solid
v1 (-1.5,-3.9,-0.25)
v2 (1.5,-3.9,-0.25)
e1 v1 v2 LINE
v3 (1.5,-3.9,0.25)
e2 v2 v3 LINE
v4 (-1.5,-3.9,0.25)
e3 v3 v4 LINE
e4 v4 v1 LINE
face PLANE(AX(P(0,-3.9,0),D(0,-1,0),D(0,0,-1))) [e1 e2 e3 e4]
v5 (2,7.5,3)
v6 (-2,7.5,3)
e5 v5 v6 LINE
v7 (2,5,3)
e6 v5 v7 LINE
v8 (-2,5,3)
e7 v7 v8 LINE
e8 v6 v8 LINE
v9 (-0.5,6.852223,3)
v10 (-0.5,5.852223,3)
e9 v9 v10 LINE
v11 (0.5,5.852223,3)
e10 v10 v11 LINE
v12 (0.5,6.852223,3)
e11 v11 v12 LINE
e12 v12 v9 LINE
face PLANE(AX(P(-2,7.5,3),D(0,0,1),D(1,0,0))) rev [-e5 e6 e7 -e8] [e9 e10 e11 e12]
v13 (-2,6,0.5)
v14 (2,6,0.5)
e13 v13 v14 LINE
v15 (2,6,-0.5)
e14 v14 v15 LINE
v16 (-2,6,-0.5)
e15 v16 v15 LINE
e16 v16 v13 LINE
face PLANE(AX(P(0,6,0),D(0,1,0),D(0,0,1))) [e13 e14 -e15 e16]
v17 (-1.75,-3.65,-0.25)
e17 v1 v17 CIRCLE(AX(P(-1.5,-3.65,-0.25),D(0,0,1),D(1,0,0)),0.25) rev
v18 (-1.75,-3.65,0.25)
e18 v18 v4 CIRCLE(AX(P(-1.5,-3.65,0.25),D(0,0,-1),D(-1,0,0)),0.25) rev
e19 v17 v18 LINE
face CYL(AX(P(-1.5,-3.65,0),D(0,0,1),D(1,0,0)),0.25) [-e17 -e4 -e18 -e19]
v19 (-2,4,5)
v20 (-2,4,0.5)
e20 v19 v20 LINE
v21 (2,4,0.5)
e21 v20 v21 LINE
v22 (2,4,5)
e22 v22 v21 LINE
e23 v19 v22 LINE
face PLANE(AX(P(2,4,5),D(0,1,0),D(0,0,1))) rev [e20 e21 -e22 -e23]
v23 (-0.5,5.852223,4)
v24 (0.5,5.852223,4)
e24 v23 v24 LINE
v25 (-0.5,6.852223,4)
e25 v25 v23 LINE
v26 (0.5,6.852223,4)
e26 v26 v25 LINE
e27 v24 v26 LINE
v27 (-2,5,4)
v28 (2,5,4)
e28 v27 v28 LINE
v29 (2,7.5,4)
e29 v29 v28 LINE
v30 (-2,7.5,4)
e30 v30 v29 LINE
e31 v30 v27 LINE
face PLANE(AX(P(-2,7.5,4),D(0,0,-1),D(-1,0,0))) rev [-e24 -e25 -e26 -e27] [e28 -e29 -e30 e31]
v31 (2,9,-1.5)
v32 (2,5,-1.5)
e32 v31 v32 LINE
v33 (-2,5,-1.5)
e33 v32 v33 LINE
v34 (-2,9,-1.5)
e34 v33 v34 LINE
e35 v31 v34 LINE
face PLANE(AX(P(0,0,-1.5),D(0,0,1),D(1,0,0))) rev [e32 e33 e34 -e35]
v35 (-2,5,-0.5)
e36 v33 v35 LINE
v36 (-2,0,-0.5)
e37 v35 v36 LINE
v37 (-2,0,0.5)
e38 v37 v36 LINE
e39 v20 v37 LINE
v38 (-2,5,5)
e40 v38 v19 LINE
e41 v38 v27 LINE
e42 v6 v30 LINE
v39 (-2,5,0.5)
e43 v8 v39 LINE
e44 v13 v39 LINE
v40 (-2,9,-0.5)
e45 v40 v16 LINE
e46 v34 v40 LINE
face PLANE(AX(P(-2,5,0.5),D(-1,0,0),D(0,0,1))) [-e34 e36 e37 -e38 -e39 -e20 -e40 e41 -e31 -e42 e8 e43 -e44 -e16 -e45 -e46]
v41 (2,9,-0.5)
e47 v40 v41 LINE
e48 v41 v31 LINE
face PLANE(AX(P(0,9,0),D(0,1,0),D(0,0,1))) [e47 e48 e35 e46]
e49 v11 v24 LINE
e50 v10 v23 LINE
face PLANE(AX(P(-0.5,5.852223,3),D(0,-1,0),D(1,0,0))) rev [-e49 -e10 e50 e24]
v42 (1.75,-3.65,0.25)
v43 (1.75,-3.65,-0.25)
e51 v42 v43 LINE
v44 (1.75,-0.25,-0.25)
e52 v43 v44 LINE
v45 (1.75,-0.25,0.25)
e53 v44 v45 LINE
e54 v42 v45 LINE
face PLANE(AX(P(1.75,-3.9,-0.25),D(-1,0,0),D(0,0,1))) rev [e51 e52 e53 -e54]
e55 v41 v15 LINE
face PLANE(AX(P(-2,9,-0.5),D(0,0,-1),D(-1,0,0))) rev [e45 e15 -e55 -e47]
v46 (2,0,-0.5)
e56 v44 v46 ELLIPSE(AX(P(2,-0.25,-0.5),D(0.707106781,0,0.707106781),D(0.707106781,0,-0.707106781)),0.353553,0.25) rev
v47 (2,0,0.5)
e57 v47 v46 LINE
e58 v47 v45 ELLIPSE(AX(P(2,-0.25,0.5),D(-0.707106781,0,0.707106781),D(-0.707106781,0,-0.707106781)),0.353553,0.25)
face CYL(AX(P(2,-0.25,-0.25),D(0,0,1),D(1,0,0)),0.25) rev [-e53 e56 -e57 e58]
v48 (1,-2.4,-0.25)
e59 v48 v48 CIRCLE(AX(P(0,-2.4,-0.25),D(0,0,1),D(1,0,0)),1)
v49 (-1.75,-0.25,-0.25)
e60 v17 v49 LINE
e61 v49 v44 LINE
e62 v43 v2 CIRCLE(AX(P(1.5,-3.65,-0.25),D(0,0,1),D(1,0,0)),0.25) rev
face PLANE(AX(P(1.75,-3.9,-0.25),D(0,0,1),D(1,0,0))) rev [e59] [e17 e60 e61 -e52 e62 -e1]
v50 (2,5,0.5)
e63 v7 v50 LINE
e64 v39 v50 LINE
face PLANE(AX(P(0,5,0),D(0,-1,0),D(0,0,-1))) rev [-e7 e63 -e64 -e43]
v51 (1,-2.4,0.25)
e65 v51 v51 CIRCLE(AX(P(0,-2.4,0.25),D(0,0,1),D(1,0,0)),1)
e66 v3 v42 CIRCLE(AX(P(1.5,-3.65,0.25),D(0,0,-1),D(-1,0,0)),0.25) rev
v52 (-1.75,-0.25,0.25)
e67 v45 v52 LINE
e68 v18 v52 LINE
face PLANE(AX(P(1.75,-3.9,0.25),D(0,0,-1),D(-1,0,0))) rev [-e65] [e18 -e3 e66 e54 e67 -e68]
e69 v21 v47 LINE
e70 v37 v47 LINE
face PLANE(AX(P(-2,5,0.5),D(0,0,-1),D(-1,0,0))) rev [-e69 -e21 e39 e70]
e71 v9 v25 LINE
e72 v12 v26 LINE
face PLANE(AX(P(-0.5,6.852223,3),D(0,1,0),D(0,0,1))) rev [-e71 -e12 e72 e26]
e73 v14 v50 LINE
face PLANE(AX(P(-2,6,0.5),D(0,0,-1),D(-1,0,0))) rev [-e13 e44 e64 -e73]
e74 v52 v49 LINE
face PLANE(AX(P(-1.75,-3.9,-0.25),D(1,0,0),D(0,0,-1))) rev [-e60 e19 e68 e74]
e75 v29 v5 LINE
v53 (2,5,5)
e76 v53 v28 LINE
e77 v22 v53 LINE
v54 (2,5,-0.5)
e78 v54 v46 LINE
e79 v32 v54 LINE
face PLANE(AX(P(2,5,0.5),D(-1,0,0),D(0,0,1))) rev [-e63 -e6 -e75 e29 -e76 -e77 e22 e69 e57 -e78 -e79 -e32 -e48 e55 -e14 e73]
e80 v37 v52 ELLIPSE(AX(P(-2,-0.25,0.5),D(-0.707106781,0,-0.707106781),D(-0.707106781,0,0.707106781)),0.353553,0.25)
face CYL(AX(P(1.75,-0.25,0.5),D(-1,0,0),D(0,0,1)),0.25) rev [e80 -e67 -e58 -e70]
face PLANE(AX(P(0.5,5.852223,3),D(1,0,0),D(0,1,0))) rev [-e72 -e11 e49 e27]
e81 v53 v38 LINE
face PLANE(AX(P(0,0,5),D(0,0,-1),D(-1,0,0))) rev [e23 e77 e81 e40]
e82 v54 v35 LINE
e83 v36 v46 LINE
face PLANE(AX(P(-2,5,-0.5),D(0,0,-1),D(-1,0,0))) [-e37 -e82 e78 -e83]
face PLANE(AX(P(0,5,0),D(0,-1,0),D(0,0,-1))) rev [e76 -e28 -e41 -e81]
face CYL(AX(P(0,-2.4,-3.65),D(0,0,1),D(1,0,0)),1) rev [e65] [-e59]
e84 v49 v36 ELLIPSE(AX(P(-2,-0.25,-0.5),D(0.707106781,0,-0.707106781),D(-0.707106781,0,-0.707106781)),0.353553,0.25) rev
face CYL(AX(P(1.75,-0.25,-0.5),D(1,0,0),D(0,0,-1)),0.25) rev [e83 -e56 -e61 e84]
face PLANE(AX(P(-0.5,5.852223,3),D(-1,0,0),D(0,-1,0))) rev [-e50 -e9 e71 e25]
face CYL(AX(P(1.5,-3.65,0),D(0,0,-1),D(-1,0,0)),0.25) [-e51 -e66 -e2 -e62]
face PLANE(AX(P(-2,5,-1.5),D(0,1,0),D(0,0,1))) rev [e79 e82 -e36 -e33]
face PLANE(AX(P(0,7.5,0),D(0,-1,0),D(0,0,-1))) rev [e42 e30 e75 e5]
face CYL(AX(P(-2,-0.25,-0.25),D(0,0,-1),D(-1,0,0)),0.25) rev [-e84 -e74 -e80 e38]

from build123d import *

# Parameters (mm, degrees)
SZKIC1_W                    = 4
SZKIC1_H                    = 1
DODANIE_WYCI_GNI_CIE1_DEPTH = 5
SZKIC2_W                    = 4
SZKIC2_H                    = 1
DODANIE_WYCI_GNI_CIE2_DEPTH = 4.5
SZKIC3_W                    = 4
SZKIC3_H                    = 1
DODANIE_WYCI_GNI_CIE3_DEPTH = 1
SZKIC4_W                    = 4
SZKIC4_H                    = 1
DODANIE_WYCI_GNI_CIE4_DEPTH = 1
SZKIC5_W                    = 4
SZKIC5_H                    = 1
DODANIE_WYCI_GNI_CIE5_DEPTH = 3
SZKIC6_W                    = 4
SZKIC6_H                    = 1
DODANIE_WYCI_GNI_CIE6_DEPTH = 2.5
SZKIC8_W                    = 3.5
SZKIC8_H                    = 0.5
DODANIE_WYCI_GNI_CIE7_DEPTH = 3.9
SZKIC9_R                    = 1
WYTNIJ_WYCI_GNI_CIE2_DEPTH  = 3.9
ZAOKR_GLENIE1_R             = 0.25
SZKIC10_W                   = 1
SZKIC10_H                   = 1
WYTNIJ_WYCI_GNI_CIE3_DEPTH  = 1


with BuildPart() as part:
    # Szkic1 → Dodanie-wyciągnięcie1 (new body)
    with BuildSketch(Plane(origin=(0, 0, 0), x_dir=(1, 0, 0), z_dir=(0, 1, 0))):
        Rectangle(SZKIC1_W, SZKIC1_H)
    extrude(amount=DODANIE_WYCI_GNI_CIE1_DEPTH)

    # Szkic2 → Dodanie-wyciągnięcie2 (add)
    with BuildSketch(Plane.XY.offset(0.5)):
        with Locations((0, 4.5)):
            Rectangle(SZKIC2_W, SZKIC2_H)
    extrude(amount=DODANIE_WYCI_GNI_CIE2_DEPTH)

    # Szkic3 → Dodanie-wyciągnięcie3 (add)
    with BuildSketch(Plane(origin=(0, 5, 0), x_dir=(1, 0, 0), z_dir=(0, 1, 0))):
        Rectangle(SZKIC3_W, SZKIC3_H)
    extrude(amount=DODANIE_WYCI_GNI_CIE3_DEPTH)

    # Szkic4 → Dodanie-wyciągnięcie4 (add)
    with BuildSketch(Plane(origin=(0, 0, -0.5), x_dir=(-1, 0, 0), z_dir=(0, 0, -1))):
        with Locations((0, 5.5)):
            Rectangle(SZKIC4_W, SZKIC4_H)
    extrude(amount=DODANIE_WYCI_GNI_CIE4_DEPTH)

    # Szkic5 → Dodanie-wyciągnięcie5 (add)
    with BuildSketch(Plane(origin=(0, 6, 0), x_dir=(1, 0, 0), z_dir=(0, 1, 0))):
        with Locations((0, 1)):
            Rectangle(SZKIC5_W, SZKIC5_H)
    extrude(amount=DODANIE_WYCI_GNI_CIE5_DEPTH)

    # Szkic6 → Dodanie-wyciągnięcie6 (add)
    with BuildSketch(Plane(origin=(0, 5, 0), x_dir=(1, 0, 0), z_dir=(0, 1, 0))):
        with Locations((0, -3.5)):
            Rectangle(SZKIC6_W, SZKIC6_H)
    extrude(amount=DODANIE_WYCI_GNI_CIE6_DEPTH)

    # Szkic8 → Dodanie-wyciągnięcie7 (add)
    with BuildSketch(Plane.XZ):
        Rectangle(SZKIC8_W, SZKIC8_H)
    extrude(amount=DODANIE_WYCI_GNI_CIE7_DEPTH)

    # Szkic9 → Wytnij-wyciągnięcie2 (cut)
    with BuildSketch(Plane.XY.offset(0.25)):
        with Locations((0, -2.4)):
            Circle(SZKIC9_R)
    extrude(amount=-WYTNIJ_WYCI_GNI_CIE2_DEPTH, mode=Mode.SUBTRACT)

    # Zaokrąglenie1
    zaokr_glenie1_edges = [part.edges().sort_by_distance(p)[0] for p in [
        (-1.75, 0, 0),
        (0, 0, -0.25),
        (1.75, 0, 0),
        (0, 0, 0.25),
        (-1.75, -3.9, 0),
        (1.75, -3.9, 0),
    ]]
    fillet(zaokr_glenie1_edges, radius=ZAOKR_GLENIE1_R - 0.0001)  # a hair under: the kernel refuses the full size

    # Szkic10 → Wytnij-wyciągnięcie3 (cut)
    with BuildSketch(Plane.XY.offset(4)):
        with Locations((0, 6.352223481)):
            Rectangle(SZKIC10_W, SZKIC10_H)
    extrude(amount=-WYTNIJ_WYCI_GNI_CIE3_DEPTH, mode=Mode.SUBTRACT)


solid = part.part
